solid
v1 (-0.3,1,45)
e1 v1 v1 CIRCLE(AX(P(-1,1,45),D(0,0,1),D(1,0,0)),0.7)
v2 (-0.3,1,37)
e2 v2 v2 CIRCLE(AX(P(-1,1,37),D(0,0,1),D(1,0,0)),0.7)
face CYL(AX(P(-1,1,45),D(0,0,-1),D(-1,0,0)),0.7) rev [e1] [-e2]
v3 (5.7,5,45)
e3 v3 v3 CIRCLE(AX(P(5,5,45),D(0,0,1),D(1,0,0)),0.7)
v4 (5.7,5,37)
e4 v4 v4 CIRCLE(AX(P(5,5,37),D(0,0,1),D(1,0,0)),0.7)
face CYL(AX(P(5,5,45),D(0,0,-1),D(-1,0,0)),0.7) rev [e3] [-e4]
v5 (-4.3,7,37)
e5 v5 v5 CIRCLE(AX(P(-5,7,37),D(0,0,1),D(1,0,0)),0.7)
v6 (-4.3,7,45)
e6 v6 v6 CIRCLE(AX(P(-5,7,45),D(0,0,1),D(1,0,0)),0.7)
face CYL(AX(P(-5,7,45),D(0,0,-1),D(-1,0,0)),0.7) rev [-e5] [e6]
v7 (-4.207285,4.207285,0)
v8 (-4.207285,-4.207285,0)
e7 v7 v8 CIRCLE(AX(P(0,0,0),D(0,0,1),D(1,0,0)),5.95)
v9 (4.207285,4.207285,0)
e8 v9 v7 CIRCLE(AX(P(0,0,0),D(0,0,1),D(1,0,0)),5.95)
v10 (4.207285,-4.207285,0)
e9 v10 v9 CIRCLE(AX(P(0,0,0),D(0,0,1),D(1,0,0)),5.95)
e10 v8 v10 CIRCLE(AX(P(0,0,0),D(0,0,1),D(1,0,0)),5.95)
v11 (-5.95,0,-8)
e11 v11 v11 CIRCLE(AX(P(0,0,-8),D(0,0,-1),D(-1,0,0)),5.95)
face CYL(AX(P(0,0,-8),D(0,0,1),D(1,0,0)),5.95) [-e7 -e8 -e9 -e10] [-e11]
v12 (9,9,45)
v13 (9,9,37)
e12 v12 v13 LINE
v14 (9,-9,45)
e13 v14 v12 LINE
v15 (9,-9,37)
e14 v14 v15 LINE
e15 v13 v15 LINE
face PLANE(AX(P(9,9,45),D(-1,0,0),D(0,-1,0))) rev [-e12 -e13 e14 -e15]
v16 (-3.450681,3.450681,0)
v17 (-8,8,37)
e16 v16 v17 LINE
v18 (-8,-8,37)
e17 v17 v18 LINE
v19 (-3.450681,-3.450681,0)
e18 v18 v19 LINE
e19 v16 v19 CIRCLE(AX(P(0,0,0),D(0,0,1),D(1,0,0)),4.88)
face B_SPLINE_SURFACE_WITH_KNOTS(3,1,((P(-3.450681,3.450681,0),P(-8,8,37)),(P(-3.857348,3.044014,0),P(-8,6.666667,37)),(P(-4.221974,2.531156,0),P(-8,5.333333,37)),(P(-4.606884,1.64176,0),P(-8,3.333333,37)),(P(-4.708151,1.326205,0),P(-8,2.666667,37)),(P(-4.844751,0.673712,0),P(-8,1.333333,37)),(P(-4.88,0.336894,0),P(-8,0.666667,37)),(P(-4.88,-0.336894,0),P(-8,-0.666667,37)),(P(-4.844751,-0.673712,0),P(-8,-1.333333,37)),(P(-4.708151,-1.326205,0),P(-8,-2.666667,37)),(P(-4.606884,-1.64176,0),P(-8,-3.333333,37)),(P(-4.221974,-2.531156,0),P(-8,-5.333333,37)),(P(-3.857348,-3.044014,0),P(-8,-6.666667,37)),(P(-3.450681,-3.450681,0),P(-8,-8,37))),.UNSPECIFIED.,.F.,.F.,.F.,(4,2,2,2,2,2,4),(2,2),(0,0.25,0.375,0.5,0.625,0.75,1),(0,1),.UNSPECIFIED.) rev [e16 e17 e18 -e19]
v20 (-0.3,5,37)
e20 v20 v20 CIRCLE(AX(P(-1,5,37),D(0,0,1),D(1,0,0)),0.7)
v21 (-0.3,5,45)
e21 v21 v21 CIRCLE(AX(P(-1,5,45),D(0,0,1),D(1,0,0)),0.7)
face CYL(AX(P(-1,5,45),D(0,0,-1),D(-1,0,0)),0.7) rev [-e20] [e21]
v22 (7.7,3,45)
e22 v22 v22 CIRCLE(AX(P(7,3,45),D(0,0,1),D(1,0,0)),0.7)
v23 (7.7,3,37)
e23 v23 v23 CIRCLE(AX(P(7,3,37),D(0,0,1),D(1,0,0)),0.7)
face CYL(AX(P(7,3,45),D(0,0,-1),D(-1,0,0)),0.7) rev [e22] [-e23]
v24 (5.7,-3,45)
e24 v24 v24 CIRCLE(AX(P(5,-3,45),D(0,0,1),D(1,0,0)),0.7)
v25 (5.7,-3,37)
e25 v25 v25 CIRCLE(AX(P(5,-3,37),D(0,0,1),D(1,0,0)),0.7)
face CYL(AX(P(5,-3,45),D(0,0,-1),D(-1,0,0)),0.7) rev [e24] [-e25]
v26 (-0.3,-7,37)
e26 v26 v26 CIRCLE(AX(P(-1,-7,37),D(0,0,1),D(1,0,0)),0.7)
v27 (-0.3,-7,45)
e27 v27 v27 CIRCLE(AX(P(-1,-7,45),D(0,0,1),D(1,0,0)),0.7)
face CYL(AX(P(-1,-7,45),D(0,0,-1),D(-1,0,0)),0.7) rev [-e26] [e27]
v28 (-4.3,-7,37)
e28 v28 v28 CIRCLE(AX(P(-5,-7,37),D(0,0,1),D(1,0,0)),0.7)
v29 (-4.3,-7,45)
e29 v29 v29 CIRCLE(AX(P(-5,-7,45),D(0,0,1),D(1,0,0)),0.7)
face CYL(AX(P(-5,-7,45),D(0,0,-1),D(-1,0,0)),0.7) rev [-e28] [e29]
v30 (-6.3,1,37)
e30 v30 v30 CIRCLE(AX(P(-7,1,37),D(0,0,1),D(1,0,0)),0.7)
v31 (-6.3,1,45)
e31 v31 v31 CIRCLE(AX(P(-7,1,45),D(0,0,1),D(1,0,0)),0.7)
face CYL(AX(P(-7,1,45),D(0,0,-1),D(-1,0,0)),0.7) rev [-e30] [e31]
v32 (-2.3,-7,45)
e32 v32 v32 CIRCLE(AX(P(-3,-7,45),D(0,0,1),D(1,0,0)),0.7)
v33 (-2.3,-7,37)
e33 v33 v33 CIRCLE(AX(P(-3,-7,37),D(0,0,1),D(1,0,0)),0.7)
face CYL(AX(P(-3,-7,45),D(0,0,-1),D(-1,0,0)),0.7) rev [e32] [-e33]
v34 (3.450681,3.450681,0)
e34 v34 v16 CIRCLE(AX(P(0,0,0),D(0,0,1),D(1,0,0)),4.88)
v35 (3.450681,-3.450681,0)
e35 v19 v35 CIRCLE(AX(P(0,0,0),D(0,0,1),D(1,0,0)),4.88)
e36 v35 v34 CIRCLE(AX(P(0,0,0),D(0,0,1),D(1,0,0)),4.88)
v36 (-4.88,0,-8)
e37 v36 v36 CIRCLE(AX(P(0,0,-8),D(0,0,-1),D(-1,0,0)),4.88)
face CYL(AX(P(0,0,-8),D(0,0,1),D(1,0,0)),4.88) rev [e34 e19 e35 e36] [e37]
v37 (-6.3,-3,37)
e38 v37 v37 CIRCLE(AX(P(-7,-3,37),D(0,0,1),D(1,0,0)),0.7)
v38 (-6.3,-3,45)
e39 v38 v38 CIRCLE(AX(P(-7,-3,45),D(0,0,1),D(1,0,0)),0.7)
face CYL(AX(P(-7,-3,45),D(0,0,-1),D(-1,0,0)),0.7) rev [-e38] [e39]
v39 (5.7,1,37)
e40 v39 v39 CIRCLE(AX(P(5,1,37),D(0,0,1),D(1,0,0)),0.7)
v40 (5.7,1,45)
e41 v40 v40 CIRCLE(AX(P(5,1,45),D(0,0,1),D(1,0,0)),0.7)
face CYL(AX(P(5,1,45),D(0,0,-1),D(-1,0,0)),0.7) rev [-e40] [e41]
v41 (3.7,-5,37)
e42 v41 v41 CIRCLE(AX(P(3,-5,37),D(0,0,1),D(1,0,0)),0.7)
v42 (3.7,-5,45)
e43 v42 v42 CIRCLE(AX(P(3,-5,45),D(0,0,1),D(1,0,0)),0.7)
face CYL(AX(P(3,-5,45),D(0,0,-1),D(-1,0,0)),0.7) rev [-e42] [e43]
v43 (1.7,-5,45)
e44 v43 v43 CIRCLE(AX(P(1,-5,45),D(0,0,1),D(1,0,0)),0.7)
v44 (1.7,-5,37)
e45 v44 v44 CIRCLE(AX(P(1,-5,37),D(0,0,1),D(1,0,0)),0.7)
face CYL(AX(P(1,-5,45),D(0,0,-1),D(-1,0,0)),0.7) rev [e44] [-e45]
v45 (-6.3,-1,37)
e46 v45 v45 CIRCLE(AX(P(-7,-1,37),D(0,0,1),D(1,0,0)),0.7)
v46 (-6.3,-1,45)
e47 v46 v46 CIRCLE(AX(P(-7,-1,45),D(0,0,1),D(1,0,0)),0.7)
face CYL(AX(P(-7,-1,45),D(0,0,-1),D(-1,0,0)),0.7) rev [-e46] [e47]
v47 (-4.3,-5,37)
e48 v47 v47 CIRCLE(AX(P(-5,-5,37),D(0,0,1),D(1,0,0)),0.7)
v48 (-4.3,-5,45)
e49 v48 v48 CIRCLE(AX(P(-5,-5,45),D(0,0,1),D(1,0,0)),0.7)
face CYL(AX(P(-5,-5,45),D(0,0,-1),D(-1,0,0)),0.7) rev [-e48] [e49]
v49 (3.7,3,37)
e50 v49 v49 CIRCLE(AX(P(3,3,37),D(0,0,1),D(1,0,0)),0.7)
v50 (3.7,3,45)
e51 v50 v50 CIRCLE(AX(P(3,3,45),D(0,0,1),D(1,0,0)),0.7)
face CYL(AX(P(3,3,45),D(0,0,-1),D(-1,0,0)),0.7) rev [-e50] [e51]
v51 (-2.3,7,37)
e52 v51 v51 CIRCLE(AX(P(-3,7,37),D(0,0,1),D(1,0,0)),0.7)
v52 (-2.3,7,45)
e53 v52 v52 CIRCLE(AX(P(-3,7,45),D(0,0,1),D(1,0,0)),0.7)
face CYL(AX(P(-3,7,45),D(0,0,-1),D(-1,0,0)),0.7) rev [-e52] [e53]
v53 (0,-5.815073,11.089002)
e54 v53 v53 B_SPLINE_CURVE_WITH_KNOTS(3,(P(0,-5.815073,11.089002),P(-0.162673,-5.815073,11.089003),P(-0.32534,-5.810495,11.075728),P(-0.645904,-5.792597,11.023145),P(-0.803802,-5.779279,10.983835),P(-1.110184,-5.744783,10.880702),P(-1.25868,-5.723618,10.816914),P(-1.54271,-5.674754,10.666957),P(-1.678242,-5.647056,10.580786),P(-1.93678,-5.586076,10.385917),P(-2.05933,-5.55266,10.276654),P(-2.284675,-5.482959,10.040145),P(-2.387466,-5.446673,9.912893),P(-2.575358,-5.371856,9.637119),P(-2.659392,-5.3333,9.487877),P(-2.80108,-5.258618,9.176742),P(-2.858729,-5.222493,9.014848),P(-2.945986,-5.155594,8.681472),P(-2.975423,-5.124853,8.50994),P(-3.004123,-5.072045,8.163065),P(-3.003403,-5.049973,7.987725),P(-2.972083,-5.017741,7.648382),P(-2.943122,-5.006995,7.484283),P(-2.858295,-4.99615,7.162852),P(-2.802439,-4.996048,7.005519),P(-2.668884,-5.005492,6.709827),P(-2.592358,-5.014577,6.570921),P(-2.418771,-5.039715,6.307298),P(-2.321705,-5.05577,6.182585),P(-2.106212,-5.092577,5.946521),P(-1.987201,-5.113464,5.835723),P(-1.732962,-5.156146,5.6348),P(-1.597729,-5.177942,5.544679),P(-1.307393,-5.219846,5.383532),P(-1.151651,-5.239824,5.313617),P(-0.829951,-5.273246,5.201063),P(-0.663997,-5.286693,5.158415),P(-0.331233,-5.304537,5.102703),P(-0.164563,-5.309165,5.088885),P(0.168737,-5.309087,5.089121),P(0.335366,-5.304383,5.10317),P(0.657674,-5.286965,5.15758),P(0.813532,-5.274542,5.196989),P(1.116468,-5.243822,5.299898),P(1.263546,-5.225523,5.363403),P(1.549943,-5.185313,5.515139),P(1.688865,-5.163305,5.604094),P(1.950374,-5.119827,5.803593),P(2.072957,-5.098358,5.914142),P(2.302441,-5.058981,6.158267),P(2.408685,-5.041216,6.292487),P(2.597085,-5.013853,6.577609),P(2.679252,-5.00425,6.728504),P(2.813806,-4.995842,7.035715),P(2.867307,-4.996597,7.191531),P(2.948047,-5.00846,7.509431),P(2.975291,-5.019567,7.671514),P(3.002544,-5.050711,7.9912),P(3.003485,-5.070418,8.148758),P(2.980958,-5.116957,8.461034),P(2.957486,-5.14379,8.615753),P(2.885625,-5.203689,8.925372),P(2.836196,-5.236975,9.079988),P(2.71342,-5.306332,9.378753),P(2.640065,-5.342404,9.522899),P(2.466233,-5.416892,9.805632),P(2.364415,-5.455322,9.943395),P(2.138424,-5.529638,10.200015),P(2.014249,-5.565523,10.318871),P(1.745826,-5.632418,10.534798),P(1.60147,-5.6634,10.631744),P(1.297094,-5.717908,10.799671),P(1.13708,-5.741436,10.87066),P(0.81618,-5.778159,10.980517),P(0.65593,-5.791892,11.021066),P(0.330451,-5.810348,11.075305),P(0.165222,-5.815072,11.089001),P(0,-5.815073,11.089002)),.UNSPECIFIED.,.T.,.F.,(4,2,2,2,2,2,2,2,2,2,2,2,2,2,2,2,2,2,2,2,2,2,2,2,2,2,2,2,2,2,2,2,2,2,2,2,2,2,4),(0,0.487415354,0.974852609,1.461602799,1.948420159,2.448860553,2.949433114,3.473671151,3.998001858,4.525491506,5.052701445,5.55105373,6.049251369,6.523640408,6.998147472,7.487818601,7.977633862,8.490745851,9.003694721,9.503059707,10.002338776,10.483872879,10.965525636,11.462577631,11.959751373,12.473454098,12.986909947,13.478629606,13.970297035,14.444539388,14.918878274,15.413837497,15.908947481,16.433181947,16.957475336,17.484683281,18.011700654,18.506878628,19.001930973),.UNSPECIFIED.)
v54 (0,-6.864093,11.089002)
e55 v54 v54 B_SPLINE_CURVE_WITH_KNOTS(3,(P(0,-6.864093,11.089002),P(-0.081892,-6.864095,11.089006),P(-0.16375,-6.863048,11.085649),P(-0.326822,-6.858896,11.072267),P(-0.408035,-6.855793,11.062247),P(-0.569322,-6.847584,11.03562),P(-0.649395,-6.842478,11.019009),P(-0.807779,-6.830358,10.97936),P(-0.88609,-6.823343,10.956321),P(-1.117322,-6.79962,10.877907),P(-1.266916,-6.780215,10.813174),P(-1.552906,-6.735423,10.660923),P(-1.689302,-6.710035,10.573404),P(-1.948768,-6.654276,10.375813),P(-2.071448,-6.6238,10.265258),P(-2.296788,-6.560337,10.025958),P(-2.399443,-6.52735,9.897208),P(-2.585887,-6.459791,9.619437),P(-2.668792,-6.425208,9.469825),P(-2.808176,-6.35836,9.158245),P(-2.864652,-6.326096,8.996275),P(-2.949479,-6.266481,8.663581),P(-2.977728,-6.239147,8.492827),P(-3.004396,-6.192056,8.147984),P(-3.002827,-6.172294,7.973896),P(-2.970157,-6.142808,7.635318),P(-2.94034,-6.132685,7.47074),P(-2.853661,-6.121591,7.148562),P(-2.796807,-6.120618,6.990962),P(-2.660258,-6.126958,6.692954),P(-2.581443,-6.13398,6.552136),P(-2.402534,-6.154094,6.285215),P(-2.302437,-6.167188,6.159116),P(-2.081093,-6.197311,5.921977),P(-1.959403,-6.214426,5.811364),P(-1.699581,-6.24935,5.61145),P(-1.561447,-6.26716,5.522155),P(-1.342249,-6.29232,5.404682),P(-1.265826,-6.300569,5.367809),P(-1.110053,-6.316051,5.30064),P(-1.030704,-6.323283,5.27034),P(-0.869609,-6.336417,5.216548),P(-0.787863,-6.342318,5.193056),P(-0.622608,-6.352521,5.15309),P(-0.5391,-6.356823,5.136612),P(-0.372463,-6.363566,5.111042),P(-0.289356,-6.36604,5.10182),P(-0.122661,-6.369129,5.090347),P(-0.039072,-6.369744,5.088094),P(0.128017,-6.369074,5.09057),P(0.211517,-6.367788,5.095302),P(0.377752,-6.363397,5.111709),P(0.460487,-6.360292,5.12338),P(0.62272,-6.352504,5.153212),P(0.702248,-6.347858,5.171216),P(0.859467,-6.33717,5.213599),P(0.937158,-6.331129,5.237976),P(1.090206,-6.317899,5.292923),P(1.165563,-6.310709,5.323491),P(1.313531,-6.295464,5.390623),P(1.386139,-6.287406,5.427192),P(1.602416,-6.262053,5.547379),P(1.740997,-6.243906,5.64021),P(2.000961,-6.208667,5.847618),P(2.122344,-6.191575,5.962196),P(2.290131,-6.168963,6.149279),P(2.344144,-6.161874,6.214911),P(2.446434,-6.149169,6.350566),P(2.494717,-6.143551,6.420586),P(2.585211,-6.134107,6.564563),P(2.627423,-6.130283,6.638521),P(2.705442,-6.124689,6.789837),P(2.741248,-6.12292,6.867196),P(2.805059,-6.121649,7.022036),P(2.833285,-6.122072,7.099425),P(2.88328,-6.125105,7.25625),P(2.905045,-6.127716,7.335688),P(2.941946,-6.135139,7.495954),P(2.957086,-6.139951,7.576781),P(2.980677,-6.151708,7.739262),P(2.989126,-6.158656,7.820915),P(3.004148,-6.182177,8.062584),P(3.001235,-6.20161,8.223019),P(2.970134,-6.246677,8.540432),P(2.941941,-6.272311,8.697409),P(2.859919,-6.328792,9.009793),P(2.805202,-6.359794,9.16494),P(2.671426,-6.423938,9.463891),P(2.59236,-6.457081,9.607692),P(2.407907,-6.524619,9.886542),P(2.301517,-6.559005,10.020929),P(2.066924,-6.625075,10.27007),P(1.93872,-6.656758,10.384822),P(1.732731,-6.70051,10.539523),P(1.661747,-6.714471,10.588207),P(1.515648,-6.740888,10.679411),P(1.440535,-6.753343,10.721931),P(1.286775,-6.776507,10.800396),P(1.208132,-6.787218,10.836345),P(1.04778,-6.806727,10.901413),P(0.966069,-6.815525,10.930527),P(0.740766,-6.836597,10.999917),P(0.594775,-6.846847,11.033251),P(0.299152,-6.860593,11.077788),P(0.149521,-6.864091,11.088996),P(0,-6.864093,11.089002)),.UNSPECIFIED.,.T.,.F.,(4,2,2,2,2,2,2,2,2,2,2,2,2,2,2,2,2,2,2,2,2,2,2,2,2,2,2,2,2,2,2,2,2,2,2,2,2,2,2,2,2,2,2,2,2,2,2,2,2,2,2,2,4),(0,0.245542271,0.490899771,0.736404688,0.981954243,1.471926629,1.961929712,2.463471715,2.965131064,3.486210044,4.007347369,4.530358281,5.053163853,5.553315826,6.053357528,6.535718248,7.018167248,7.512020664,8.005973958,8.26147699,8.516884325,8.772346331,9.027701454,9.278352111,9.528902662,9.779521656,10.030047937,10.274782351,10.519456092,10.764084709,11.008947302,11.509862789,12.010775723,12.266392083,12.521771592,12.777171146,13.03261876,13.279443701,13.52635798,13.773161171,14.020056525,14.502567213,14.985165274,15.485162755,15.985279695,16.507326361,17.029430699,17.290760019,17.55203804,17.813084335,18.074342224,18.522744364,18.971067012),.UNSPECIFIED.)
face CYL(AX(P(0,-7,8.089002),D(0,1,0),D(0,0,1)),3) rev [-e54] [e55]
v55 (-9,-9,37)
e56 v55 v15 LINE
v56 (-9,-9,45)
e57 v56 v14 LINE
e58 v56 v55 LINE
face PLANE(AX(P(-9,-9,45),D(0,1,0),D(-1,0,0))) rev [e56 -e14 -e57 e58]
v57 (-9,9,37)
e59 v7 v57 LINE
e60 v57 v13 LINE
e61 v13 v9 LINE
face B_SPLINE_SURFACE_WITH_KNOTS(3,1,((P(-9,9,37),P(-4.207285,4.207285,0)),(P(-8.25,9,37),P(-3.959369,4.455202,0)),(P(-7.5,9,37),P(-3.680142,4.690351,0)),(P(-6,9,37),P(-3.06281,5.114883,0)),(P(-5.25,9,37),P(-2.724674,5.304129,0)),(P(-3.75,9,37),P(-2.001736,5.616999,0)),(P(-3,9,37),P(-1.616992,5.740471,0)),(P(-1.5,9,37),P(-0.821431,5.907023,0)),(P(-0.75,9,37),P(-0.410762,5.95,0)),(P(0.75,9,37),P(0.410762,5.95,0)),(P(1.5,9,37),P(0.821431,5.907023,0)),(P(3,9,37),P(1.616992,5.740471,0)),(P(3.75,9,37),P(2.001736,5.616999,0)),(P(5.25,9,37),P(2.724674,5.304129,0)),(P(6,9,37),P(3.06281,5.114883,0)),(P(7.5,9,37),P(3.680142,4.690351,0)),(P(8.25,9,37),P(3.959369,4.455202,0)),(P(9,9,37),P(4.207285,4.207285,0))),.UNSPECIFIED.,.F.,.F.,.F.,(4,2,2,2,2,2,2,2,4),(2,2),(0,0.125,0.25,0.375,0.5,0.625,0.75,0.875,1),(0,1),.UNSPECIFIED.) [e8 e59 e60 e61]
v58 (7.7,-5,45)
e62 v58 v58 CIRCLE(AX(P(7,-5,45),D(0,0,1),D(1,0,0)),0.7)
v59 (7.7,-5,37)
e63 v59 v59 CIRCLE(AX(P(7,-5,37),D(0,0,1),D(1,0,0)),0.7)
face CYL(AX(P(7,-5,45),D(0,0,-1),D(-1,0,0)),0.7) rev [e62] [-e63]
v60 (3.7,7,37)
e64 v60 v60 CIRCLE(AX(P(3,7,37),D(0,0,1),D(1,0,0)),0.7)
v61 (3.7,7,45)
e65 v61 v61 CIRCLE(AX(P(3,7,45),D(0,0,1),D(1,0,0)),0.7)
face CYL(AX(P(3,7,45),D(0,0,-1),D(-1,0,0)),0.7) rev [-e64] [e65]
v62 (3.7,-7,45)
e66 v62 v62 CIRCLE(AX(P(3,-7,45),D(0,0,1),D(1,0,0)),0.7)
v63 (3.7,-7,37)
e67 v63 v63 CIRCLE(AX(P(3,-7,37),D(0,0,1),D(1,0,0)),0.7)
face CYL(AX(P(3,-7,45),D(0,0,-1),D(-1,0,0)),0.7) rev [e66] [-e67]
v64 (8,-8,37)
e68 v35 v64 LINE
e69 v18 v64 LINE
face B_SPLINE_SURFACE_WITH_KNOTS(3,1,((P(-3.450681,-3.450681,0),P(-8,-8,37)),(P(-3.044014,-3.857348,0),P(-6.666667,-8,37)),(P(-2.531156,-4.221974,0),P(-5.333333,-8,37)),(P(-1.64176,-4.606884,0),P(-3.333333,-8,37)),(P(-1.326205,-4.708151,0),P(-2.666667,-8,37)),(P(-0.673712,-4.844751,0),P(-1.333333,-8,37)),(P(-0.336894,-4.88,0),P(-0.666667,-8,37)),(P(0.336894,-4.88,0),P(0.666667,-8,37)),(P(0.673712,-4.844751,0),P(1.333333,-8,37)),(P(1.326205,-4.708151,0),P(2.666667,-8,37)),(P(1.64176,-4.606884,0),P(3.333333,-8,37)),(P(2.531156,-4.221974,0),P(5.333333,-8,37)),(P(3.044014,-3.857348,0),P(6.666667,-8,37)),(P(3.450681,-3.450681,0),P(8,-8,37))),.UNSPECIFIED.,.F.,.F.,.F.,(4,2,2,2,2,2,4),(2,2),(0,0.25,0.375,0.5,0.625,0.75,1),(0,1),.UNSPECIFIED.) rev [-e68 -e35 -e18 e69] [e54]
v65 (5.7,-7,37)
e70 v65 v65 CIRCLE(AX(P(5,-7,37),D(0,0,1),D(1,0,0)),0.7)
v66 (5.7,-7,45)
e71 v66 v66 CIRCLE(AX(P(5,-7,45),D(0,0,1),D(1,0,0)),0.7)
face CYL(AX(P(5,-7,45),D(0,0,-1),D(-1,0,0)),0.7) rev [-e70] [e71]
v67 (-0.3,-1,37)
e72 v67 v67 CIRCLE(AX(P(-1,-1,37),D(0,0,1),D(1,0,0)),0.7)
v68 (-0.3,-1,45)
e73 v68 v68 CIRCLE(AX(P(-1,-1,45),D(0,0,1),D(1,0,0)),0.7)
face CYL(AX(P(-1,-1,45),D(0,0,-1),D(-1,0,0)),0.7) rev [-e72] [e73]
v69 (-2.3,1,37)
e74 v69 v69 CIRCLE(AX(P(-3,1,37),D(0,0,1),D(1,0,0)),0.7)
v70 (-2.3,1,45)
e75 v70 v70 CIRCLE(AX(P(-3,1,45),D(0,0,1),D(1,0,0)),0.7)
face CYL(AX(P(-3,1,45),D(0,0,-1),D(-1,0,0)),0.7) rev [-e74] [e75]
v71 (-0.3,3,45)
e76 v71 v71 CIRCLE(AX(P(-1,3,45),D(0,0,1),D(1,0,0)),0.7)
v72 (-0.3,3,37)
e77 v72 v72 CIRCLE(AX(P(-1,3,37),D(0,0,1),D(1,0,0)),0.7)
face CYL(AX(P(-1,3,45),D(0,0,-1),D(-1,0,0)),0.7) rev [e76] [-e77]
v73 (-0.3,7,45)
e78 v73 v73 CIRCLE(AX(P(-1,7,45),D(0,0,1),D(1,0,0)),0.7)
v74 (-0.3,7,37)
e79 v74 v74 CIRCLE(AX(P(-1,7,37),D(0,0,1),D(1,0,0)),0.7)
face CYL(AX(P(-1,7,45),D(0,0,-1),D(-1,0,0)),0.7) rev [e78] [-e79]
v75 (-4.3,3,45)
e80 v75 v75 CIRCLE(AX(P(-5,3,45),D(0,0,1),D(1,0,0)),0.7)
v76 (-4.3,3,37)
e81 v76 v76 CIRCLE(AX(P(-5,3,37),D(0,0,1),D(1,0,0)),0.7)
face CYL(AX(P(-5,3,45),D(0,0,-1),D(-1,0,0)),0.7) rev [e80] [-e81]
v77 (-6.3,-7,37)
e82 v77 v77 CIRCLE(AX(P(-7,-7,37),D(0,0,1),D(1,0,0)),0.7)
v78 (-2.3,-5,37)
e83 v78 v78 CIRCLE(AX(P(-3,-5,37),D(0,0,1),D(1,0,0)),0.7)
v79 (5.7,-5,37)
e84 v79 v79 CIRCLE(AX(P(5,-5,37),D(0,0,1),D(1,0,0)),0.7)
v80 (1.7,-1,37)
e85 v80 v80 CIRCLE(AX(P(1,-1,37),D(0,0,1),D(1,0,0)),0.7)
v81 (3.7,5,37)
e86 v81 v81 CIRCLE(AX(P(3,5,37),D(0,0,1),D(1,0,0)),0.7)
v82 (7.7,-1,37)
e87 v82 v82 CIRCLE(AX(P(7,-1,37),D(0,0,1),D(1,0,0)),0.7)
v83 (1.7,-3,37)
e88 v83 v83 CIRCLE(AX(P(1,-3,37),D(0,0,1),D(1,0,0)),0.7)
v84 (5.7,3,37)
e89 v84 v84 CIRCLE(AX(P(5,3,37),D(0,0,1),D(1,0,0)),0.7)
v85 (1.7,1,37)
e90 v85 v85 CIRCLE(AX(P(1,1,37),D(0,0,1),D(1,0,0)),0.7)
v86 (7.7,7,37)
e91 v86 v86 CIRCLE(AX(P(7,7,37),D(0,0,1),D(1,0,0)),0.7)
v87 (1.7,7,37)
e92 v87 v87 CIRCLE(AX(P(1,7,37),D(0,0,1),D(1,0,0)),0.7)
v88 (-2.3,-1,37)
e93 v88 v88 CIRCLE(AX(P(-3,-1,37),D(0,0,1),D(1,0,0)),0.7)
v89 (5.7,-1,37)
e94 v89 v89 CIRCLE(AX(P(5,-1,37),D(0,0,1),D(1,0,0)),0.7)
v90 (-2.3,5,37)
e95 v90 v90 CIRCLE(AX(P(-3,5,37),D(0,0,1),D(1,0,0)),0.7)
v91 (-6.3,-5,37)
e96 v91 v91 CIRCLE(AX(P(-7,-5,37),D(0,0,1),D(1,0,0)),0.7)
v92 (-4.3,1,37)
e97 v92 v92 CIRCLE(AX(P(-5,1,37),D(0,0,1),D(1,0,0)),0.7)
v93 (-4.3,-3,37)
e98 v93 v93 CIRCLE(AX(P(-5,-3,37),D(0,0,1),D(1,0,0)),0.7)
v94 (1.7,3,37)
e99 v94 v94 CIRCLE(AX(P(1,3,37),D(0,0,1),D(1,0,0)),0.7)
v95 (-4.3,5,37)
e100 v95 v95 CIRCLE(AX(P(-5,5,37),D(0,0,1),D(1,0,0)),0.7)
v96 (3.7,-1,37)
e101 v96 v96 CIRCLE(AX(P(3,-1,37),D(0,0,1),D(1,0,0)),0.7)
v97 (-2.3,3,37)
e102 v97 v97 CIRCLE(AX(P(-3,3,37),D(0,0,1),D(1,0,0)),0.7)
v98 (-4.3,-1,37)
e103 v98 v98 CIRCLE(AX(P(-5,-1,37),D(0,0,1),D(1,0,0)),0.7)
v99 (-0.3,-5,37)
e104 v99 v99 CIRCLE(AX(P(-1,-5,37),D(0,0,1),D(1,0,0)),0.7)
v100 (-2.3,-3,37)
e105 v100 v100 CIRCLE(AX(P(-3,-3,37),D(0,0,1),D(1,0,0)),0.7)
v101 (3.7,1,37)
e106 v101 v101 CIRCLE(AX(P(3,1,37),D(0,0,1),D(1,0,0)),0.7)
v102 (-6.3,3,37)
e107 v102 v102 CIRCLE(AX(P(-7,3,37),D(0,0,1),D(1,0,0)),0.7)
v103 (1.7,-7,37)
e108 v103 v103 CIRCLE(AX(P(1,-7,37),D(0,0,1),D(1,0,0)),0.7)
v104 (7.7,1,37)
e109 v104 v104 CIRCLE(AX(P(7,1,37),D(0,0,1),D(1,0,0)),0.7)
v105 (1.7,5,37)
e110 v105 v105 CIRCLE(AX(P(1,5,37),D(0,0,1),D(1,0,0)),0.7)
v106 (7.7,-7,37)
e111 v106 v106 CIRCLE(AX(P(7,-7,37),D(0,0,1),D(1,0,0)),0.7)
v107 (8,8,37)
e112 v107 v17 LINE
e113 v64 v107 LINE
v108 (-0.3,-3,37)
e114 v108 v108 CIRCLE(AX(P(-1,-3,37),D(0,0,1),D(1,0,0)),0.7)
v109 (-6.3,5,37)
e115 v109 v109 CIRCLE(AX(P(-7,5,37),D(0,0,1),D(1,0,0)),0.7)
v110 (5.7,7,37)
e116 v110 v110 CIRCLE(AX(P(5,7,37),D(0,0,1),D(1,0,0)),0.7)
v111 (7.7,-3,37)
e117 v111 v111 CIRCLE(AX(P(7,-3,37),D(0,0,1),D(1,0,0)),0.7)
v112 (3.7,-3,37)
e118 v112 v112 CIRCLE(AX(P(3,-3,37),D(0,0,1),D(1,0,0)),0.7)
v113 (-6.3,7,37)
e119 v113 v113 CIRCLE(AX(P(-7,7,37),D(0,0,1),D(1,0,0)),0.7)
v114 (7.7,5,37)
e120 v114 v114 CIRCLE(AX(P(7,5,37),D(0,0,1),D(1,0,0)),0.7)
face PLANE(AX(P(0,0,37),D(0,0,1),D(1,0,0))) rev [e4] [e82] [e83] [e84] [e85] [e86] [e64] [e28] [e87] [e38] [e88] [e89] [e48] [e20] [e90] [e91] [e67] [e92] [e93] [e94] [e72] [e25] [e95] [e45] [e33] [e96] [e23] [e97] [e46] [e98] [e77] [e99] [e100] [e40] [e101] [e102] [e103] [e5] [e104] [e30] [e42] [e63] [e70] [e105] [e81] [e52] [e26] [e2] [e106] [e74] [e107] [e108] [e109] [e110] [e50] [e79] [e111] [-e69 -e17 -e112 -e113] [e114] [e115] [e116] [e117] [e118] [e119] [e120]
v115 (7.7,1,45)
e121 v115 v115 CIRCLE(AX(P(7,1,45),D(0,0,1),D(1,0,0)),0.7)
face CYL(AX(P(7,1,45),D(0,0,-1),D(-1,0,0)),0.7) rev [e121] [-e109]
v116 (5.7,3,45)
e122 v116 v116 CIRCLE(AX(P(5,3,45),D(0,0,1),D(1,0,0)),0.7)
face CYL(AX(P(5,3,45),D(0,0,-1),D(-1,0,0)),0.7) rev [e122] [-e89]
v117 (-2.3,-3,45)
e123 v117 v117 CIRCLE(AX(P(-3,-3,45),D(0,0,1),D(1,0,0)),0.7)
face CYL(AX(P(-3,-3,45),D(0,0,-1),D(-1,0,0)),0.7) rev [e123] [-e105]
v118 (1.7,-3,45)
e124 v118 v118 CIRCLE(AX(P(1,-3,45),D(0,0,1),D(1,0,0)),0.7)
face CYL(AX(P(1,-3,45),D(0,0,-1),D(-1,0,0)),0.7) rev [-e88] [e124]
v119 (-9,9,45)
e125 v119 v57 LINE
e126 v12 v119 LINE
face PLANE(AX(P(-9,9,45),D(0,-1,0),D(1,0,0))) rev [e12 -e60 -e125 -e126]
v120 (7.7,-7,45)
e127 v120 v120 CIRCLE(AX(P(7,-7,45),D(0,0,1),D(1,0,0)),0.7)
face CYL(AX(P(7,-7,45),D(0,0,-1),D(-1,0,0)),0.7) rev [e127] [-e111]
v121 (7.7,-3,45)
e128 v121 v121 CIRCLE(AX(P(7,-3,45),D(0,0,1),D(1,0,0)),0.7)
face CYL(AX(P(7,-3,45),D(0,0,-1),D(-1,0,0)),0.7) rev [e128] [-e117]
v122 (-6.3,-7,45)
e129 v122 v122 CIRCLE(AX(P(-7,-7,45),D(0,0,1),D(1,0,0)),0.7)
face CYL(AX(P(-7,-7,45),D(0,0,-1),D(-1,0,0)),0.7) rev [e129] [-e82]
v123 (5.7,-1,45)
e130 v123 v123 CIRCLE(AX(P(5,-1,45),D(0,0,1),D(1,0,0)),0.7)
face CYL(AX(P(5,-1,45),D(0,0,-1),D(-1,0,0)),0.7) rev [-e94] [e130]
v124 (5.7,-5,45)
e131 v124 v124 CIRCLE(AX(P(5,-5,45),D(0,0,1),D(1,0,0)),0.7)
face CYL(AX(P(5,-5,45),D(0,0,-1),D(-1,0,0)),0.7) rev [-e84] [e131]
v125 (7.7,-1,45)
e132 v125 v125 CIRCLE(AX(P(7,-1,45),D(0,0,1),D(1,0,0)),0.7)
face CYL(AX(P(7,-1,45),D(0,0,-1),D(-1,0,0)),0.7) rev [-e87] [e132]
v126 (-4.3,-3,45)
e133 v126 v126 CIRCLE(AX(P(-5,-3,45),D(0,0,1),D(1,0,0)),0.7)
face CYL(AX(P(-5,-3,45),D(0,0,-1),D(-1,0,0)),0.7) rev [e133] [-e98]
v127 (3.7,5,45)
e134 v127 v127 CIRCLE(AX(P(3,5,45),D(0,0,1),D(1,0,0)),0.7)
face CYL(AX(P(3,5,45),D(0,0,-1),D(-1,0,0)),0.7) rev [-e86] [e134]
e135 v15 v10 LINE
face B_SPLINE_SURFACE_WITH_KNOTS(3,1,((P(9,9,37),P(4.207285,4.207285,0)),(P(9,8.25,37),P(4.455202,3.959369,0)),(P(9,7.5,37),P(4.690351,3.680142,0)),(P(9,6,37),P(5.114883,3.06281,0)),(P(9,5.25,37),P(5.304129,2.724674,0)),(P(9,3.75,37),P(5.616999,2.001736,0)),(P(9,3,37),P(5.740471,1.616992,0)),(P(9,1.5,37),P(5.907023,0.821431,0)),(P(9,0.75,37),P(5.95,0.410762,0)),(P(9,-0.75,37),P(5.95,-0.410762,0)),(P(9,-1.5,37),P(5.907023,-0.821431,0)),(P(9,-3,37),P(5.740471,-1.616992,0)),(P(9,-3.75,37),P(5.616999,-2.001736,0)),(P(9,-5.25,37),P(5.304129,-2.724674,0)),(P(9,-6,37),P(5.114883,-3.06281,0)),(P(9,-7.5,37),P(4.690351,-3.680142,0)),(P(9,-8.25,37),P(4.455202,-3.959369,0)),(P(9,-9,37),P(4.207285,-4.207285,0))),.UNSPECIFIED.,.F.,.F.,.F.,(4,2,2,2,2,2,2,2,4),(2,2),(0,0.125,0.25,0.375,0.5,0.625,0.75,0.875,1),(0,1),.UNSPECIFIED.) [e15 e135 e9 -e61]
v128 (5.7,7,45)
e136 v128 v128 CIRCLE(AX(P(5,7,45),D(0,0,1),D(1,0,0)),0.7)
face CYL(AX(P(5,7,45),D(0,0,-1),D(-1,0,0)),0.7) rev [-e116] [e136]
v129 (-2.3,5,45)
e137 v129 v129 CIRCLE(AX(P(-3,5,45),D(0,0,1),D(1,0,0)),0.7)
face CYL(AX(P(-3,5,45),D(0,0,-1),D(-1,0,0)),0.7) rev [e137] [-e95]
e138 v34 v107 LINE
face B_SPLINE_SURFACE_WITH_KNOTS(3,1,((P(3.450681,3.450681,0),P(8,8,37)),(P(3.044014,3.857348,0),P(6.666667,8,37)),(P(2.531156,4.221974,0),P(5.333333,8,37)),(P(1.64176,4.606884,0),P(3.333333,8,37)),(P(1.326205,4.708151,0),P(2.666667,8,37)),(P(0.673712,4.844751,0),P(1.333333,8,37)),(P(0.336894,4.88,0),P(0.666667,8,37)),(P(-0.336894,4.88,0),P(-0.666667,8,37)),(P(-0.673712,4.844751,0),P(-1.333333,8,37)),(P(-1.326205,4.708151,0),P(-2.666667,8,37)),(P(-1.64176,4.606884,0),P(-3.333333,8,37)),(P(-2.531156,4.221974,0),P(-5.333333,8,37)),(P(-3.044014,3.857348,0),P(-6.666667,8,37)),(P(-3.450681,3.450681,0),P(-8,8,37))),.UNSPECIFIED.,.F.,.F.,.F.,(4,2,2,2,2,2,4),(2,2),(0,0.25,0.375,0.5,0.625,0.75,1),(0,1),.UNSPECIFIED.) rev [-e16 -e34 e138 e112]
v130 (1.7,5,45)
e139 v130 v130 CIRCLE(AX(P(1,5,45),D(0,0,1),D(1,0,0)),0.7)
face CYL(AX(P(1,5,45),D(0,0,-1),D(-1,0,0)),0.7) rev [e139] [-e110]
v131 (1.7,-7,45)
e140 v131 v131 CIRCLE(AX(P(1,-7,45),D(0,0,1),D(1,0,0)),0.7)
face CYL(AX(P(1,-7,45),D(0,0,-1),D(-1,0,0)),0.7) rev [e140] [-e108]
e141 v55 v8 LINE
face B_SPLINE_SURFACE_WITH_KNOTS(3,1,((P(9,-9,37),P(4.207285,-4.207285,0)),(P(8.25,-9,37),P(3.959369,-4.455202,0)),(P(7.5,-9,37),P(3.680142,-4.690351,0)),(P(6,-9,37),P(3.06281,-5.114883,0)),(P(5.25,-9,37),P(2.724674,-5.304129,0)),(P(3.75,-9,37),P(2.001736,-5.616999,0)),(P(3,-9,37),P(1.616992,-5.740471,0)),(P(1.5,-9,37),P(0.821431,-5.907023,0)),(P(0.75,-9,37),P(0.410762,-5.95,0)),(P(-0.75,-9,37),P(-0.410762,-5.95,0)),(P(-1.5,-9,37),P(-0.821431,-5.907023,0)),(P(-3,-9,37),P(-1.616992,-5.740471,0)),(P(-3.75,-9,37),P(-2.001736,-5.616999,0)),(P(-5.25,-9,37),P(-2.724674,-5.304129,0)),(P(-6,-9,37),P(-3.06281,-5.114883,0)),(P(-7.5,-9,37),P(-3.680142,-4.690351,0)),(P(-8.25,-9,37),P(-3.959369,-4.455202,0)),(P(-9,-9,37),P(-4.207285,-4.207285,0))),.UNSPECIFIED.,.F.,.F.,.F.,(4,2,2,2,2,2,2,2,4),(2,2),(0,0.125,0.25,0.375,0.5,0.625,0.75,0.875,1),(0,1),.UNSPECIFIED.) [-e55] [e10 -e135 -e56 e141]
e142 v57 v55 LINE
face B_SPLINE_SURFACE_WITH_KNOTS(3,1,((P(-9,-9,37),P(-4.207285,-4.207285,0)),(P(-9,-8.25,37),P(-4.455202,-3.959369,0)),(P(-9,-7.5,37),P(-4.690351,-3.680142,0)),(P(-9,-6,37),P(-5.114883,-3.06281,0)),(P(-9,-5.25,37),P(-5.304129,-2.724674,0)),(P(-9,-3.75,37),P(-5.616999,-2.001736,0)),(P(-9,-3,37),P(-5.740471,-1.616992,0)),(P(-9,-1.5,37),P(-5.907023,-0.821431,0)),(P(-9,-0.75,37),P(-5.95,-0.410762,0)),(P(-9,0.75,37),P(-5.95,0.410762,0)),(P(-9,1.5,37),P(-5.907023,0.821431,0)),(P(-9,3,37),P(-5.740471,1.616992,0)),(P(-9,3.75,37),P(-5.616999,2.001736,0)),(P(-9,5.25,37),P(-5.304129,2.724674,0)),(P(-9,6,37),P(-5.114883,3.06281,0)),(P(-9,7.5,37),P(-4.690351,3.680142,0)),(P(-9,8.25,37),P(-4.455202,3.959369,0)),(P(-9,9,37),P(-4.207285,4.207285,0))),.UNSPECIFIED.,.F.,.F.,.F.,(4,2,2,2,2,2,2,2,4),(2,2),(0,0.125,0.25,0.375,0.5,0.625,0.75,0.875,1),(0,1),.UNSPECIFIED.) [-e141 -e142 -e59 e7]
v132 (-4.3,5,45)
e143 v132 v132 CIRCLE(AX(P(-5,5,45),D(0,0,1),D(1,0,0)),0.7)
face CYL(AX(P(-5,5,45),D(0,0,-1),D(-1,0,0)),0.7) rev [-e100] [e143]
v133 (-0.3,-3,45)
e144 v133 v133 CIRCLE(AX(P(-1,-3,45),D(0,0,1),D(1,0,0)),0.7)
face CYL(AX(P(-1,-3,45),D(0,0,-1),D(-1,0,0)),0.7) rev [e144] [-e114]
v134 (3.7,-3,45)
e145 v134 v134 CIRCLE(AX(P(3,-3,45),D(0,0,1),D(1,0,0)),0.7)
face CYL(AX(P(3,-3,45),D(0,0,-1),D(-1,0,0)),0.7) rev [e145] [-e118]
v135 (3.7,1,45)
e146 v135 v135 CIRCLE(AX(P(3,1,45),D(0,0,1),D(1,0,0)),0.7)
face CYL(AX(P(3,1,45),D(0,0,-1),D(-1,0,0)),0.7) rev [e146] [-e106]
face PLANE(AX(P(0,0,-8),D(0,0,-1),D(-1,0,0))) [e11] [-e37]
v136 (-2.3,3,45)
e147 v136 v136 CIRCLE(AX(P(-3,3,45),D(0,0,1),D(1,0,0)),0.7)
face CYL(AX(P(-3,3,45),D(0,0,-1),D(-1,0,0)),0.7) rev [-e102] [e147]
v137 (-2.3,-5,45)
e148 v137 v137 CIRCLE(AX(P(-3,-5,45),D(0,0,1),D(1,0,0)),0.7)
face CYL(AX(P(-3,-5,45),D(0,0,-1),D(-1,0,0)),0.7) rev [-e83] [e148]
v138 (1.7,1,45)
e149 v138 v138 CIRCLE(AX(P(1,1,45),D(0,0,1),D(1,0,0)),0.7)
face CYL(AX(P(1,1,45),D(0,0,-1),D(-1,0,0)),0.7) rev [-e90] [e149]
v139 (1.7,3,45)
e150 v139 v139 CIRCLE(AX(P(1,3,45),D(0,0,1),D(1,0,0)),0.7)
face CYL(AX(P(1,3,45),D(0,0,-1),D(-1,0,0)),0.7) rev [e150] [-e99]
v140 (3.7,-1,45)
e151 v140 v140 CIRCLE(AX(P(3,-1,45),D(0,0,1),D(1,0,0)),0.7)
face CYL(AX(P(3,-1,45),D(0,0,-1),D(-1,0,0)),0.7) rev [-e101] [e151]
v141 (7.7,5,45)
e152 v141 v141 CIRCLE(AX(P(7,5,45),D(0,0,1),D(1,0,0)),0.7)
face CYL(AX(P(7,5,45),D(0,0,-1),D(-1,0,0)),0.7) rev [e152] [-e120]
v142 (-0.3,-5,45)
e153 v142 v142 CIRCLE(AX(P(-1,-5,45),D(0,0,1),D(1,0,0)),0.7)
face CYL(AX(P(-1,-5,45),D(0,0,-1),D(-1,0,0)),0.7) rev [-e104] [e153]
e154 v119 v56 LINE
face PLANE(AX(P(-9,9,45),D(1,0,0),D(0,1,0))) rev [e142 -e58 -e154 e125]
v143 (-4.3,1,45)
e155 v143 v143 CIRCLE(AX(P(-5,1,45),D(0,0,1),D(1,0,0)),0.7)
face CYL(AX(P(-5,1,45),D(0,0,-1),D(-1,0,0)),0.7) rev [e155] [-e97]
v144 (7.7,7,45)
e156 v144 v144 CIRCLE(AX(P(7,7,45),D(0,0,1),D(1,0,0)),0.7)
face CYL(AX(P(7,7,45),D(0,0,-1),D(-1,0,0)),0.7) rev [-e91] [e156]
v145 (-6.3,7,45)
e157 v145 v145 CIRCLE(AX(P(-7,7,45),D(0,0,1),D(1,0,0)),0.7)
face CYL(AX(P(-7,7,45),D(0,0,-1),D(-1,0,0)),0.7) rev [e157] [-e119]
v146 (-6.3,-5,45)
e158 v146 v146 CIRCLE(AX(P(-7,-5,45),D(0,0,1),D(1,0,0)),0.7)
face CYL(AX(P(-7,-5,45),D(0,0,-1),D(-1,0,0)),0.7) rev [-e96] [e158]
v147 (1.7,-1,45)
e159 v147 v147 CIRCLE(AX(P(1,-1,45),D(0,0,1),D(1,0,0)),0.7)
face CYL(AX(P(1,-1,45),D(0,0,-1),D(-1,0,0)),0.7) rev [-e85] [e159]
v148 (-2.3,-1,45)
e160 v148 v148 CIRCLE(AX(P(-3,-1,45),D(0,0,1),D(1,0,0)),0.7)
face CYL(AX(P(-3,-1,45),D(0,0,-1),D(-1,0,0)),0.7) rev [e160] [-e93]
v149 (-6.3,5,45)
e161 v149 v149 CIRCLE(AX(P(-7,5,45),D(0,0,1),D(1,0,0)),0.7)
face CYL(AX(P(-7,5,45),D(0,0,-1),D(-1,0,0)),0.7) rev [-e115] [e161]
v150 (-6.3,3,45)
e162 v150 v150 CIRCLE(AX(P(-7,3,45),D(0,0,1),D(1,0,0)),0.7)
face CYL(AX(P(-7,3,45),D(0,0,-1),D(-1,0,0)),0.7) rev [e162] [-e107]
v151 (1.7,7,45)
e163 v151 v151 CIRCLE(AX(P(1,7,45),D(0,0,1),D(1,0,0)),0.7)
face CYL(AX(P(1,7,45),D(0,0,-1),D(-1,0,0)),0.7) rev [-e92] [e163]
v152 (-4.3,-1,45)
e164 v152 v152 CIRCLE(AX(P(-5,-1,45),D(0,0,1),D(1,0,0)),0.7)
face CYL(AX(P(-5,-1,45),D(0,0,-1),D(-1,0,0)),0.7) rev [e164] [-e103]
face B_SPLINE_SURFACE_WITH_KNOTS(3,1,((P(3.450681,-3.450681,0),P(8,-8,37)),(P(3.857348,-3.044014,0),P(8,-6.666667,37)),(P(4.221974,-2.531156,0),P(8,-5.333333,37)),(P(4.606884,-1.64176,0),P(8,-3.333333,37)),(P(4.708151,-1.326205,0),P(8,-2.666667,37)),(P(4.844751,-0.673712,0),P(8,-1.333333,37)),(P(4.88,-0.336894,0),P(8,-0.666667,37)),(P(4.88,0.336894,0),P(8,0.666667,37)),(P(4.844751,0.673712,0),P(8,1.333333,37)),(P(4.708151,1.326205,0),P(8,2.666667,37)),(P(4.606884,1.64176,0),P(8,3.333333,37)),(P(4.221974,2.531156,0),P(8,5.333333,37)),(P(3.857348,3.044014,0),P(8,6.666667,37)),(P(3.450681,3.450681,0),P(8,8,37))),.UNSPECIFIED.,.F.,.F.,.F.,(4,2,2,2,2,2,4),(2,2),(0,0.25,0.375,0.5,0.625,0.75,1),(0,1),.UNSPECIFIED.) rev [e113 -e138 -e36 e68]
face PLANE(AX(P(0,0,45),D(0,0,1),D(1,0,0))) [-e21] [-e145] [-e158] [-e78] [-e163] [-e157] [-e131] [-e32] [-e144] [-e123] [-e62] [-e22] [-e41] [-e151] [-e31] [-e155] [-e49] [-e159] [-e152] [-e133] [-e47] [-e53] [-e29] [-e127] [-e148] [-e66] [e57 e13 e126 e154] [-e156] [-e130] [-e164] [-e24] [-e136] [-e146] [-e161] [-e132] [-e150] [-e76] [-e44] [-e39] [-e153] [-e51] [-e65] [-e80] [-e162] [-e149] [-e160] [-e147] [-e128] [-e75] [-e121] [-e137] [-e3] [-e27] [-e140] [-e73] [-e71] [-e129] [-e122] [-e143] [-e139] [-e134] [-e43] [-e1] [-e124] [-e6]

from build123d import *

# Parameters (mm, degrees)
SKETCH4_W           = 18
SKETCH4_H           = 18
BOSS_EXTRUDE1_DEPTH = 8
SKETCH5_R           = 0.7
CUT_EXTRUDE1_DEPTH  = 8
SKETCH6_R           = 5.95
SKETCH6_R_2         = 4.88
BOSS_EXTRUDE2_DEPTH = 8
SKETCH8_R           = 3
CUT_EXTRUDE3_DEPTH  = 7


with BuildPart() as part:
    # Loft1: read off the stored shape, not the designer's step
    # Loft1: loft between two sections, ruled curve by curve
    loft1_from = [
        Edge.make_bspline([(-9, 9, 37), (-8.25, 9, 37), (-7.5, 9, 37), (-6, 9, 37), (-5.25, 9, 37), (-3.75, 9, 37), (-3, 9, 37), (-1.5, 9, 37), (-0.75, 9, 37), (0.75, 9, 37), (1.5, 9, 37), (3, 9, 37), (3.75, 9, 37), (5.25, 9, 37), (6, 9, 37), (7.5, 9, 37), (8.25, 9, 37), (9, 9, 37)], [0, 0, 0, 0, 0.125, 0.125, 0.25, 0.25, 0.375, 0.375, 0.5, 0.5, 0.625, 0.625, 0.75, 0.75, 0.875, 0.875, 1, 1, 1, 1], 3),
        Edge.make_bspline([(9, 9, 37), (9, 8.25, 37), (9, 7.5, 37), (9, 6, 37), (9, 5.25, 37), (9, 3.75, 37), (9, 3, 37), (9, 1.5, 37), (9, 0.75, 37), (9, -0.75, 37), (9, -1.5, 37), (9, -3, 37), (9, -3.75, 37), (9, -5.25, 37), (9, -6, 37), (9, -7.5, 37), (9, -8.25, 37), (9, -9, 37)], [0, 0, 0, 0, 0.125, 0.125, 0.25, 0.25, 0.375, 0.375, 0.5, 0.5, 0.625, 0.625, 0.75, 0.75, 0.875, 0.875, 1, 1, 1, 1], 3),
        Edge.make_bspline([(-9, -9, 37), (-9, -8.25, 37), (-9, -7.5, 37), (-9, -6, 37), (-9, -5.25, 37), (-9, -3.75, 37), (-9, -3, 37), (-9, -1.5, 37), (-9, -0.75, 37), (-9, 0.75, 37), (-9, 1.5, 37), (-9, 3, 37), (-9, 3.75, 37), (-9, 5.25, 37), (-9, 6, 37), (-9, 7.5, 37), (-9, 8.25, 37), (-9, 9, 37)], [0, 0, 0, 0, 0.125, 0.125, 0.25, 0.25, 0.375, 0.375, 0.5, 0.5, 0.625, 0.625, 0.75, 0.75, 0.875, 0.875, 1, 1, 1, 1], 3),
        Edge.make_bspline([(9, -9, 37), (8.25, -9, 37), (7.5, -9, 37), (6, -9, 37), (5.25, -9, 37), (3.75, -9, 37), (3, -9, 37), (1.5, -9, 37), (0.75, -9, 37), (-0.75, -9, 37), (-1.5, -9, 37), (-3, -9, 37), (-3.75, -9, 37), (-5.25, -9, 37), (-6, -9, 37), (-7.5, -9, 37), (-8.25, -9, 37), (-9, -9, 37)], [0, 0, 0, 0, 0.125, 0.125, 0.25, 0.25, 0.375, 0.375, 0.5, 0.5, 0.625, 0.625, 0.75, 0.75, 0.875, 0.875, 1, 1, 1, 1], 3),
    ]
    loft1_to = [
        Edge.make_bspline([(-4.207285348, 4.207285348, 0), (-3.959368681, 4.455202015, 0), (-3.680141586, 4.690350666, 0), (-3.062809983, 5.114882841, 0), (-2.72467395, 5.304128911, 0), (-2.001736485, 5.616999437, 0), (-1.616991653, 5.740470541, 0), (-0.821431093, 5.907022516, 0), (-0.410761783, 5.95, 0), (0.410761783, 5.95, 0), (0.821431093, 5.907022516, 0), (1.616991653, 5.740470541, 0), (2.001736485, 5.616999437, 0), (2.72467395, 5.304128911, 0), (3.062809983, 5.114882841, 0), (3.680141586, 4.690350666, 0), (3.959368681, 4.455202015, 0), (4.207285348, 4.207285348, 0)], [0, 0, 0, 0, 0.125, 0.125, 0.25, 0.25, 0.375, 0.375, 0.5, 0.5, 0.625, 0.625, 0.75, 0.75, 0.875, 0.875, 1, 1, 1, 1], 3),
        Edge.make_bspline([(4.207285348, 4.207285348, 0), (4.455202015, 3.959368681, 0), (4.690350666, 3.680141586, 0), (5.114882841, 3.062809983, 0), (5.304128911, 2.72467395, 0), (5.616999437, 2.001736485, 0), (5.740470541, 1.616991653, 0), (5.907022516, 0.821431093, 0), (5.95, 0.410761783, 0), (5.95, -0.410761783, 0), (5.907022516, -0.821431093, 0), (5.740470541, -1.616991653, 0), (5.616999437, -2.001736485, 0), (5.304128911, -2.72467395, 0), (5.114882841, -3.062809983, 0), (4.690350666, -3.680141586, 0), (4.455202015, -3.959368681, 0), (4.207285348, -4.207285348, 0)], [0, 0, 0, 0, 0.125, 0.125, 0.25, 0.25, 0.375, 0.375, 0.5, 0.5, 0.625, 0.625, 0.75, 0.75, 0.875, 0.875, 1, 1, 1, 1], 3),
        Edge.make_bspline([(-4.207285348, -4.207285348, 0), (-4.455202015, -3.959368681, 0), (-4.690350666, -3.680141586, 0), (-5.114882841, -3.062809983, 0), (-5.304128911, -2.72467395, 0), (-5.616999437, -2.001736485, 0), (-5.740470541, -1.616991653, 0), (-5.907022516, -0.821431093, 0), (-5.95, -0.410761783, 0), (-5.95, 0.410761783, 0), (-5.907022516, 0.821431093, 0), (-5.740470541, 1.616991653, 0), (-5.616999437, 2.001736485, 0), (-5.304128911, 2.72467395, 0), (-5.114882841, 3.062809983, 0), (-4.690350666, 3.680141586, 0), (-4.455202015, 3.959368681, 0), (-4.207285348, 4.207285348, 0)], [0, 0, 0, 0, 0.125, 0.125, 0.25, 0.25, 0.375, 0.375, 0.5, 0.5, 0.625, 0.625, 0.75, 0.75, 0.875, 0.875, 1, 1, 1, 1], 3),
        Edge.make_bspline([(4.207285348, -4.207285348, 0), (3.959368681, -4.455202015, 0), (3.680141586, -4.690350666, 0), (3.062809983, -5.114882841, 0), (2.72467395, -5.304128911, 0), (2.001736485, -5.616999437, 0), (1.616991653, -5.740470541, 0), (0.821431093, -5.907022516, 0), (0.410761783, -5.95, 0), (-0.410761783, -5.95, 0), (-0.821431093, -5.907022516, 0), (-1.616991653, -5.740470541, 0), (-2.001736485, -5.616999437, 0), (-2.72467395, -5.304128911, 0), (-3.062809983, -5.114882841, 0), (-3.680141586, -4.690350666, 0), (-3.959368681, -4.455202015, 0), (-4.207285348, -4.207285348, 0)], [0, 0, 0, 0, 0.125, 0.125, 0.25, 0.25, 0.375, 0.375, 0.5, 0.5, 0.625, 0.625, 0.75, 0.75, 0.875, 0.875, 1, 1, 1, 1], 3),
    ]
    loft1 = Solid(Shell([*[Face.make_surface_from_curves(loft1_from[k], loft1_to[k]) for k in range(4)], Face(Wire(loft1_from)), Face(Wire(loft1_to))]))
    add(loft1)

    # Cut-Loft1: read off the stored shape, not the designer's step
    # Cut-Loft1: loft between two sections, ruled curve by curve
    cut_loft1_from = [
        Edge.make_bspline([(-3.450681092, -3.450681092, 0), (-3.044014426, -3.857347759, 0), (-2.531155679, -4.22197395, 0), (-1.641760344, -4.606883572, 0), (-1.326204919, -4.708150629, 0), (-0.673711552, -4.84475124, 0), (-0.336893697, -4.88, 0), (0.336893697, -4.88, 0), (0.673711552, -4.84475124, 0), (1.326204919, -4.708150629, 0), (1.641760344, -4.606883572, 0), (2.531155679, -4.22197395, 0), (3.044014426, -3.857347759, 0), (3.450681092, -3.450681092, 0)], [0, 0, 0, 0, 0.25, 0.25, 0.375, 0.375, 0.5, 0.5, 0.625, 0.625, 0.75, 0.75, 1, 1, 1, 1], 3),
        Edge.make_bspline([(3.450681092, -3.450681092, 0), (3.857347759, -3.044014426, 0), (4.22197395, -2.531155679, 0), (4.606883572, -1.641760344, 0), (4.708150629, -1.326204919, 0), (4.84475124, -0.673711552, 0), (4.88, -0.336893697, 0), (4.88, 0.336893697, 0), (4.84475124, 0.673711552, 0), (4.708150629, 1.326204919, 0), (4.606883572, 1.641760344, 0), (4.22197395, 2.531155679, 0), (3.857347759, 3.044014426, 0), (3.450681092, 3.450681092, 0)], [0, 0, 0, 0, 0.25, 0.25, 0.375, 0.375, 0.5, 0.5, 0.625, 0.625, 0.75, 0.75, 1, 1, 1, 1], 3),
        Edge.make_bspline([(-3.450681092, 3.450681092, 0), (-3.857347759, 3.044014426, 0), (-4.22197395, 2.531155679, 0), (-4.606883572, 1.641760344, 0), (-4.708150629, 1.326204919, 0), (-4.84475124, 0.673711552, 0), (-4.88, 0.336893697, 0), (-4.88, -0.336893697, 0), (-4.84475124, -0.673711552, 0), (-4.708150629, -1.326204919, 0), (-4.606883572, -1.641760344, 0), (-4.22197395, -2.531155679, 0), (-3.857347759, -3.044014426, 0), (-3.450681092, -3.450681092, 0)], [0, 0, 0, 0, 0.25, 0.25, 0.375, 0.375, 0.5, 0.5, 0.625, 0.625, 0.75, 0.75, 1, 1, 1, 1], 3),
        Edge.make_bspline([(3.450681092, 3.450681092, 0), (3.044014426, 3.857347759, 0), (2.531155679, 4.22197395, 0), (1.641760344, 4.606883572, 0), (1.326204919, 4.708150629, 0), (0.673711552, 4.84475124, 0), (0.336893697, 4.88, 0), (-0.336893697, 4.88, 0), (-0.673711552, 4.84475124, 0), (-1.326204919, 4.708150629, 0), (-1.641760344, 4.606883572, 0), (-2.531155679, 4.22197395, 0), (-3.044014426, 3.857347759, 0), (-3.450681092, 3.450681092, 0)], [0, 0, 0, 0, 0.25, 0.25, 0.375, 0.375, 0.5, 0.5, 0.625, 0.625, 0.75, 0.75, 1, 1, 1, 1], 3),
    ]
    cut_loft1_to = [
        Edge.make_bspline([(-8, -8, 37), (-6.666666667, -8, 37), (-5.333333333, -8, 37), (-3.333333333, -8, 37), (-2.666666667, -8, 37), (-1.333333333, -8, 37), (-0.666666667, -8, 37), (0.666666667, -8, 37), (1.333333333, -8, 37), (2.666666667, -8, 37), (3.333333333, -8, 37), (5.333333333, -8, 37), (6.666666667, -8, 37), (8, -8, 37)], [0, 0, 0, 0, 0.25, 0.25, 0.375, 0.375, 0.5, 0.5, 0.625, 0.625, 0.75, 0.75, 1, 1, 1, 1], 3),
        Edge.make_bspline([(8, -8, 37), (8, -6.666666667, 37), (8, -5.333333333, 37), (8, -3.333333333, 37), (8, -2.666666667, 37), (8, -1.333333333, 37), (8, -0.666666667, 37), (8, 0.666666667, 37), (8, 1.333333333, 37), (8, 2.666666667, 37), (8, 3.333333333, 37), (8, 5.333333333, 37), (8, 6.666666667, 37), (8, 8, 37)], [0, 0, 0, 0, 0.25, 0.25, 0.375, 0.375, 0.5, 0.5, 0.625, 0.625, 0.75, 0.75, 1, 1, 1, 1], 3),
        Edge.make_bspline([(-8, 8, 37), (-8, 6.666666667, 37), (-8, 5.333333333, 37), (-8, 3.333333333, 37), (-8, 2.666666667, 37), (-8, 1.333333333, 37), (-8, 0.666666667, 37), (-8, -0.666666667, 37), (-8, -1.333333333, 37), (-8, -2.666666667, 37), (-8, -3.333333333, 37), (-8, -5.333333333, 37), (-8, -6.666666667, 37), (-8, -8, 37)], [0, 0, 0, 0, 0.25, 0.25, 0.375, 0.375, 0.5, 0.5, 0.625, 0.625, 0.75, 0.75, 1, 1, 1, 1], 3),
        Edge.make_bspline([(8, 8, 37), (6.666666667, 8, 37), (5.333333333, 8, 37), (3.333333333, 8, 37), (2.666666667, 8, 37), (1.333333333, 8, 37), (0.666666667, 8, 37), (-0.666666667, 8, 37), (-1.333333333, 8, 37), (-2.666666667, 8, 37), (-3.333333333, 8, 37), (-5.333333333, 8, 37), (-6.666666667, 8, 37), (-8, 8, 37)], [0, 0, 0, 0, 0.25, 0.25, 0.375, 0.375, 0.5, 0.5, 0.625, 0.625, 0.75, 0.75, 1, 1, 1, 1], 3),
    ]
    cut_loft1 = Solid(Shell([*[Face.make_surface_from_curves(cut_loft1_from[k], cut_loft1_to[k]) for k in range(4)], Face(Wire(cut_loft1_from)), Face(Wire(cut_loft1_to))]))
    add(cut_loft1, mode=Mode.SUBTRACT)

    # Sketch4 → Boss-Extrude1 (add)
    with BuildSketch(Plane.XY.offset(37)):
        Rectangle(SKETCH4_W, SKETCH4_H)
    extrude(amount=BOSS_EXTRUDE1_DEPTH)

    # Sketch5 → Cut-Extrude1 (cut)
    with BuildSketch(Plane.XY.offset(37)):
        with Locations((-7, 7)):
            Circle(SKETCH5_R)
        with Locations((-5, 7)):
            Circle(SKETCH5_R)
        with Locations((-3, 7)):
            Circle(SKETCH5_R)
        with Locations((-1, 7)):
            Circle(SKETCH5_R)
        with Locations((1, 7)):
            Circle(SKETCH5_R)
        with Locations((3, 7)):
            Circle(SKETCH5_R)
        with Locations((5, 7)):
            Circle(SKETCH5_R)
        with Locations((7, 7)):
            Circle(SKETCH5_R)
        with Locations((-5, 5)):
            Circle(SKETCH5_R)
        with Locations((-3, 5)):
            Circle(SKETCH5_R)
        with Locations((-1, 5)):
            Circle(SKETCH5_R)
        with Locations((1, 5)):
            Circle(SKETCH5_R)
        with Locations((3, 5)):
            Circle(SKETCH5_R)
        with Locations((5, 5)):
            Circle(SKETCH5_R)
        with Locations((7, 5)):
            Circle(SKETCH5_R)
        with Locations((-5, 3)):
            Circle(SKETCH5_R)
        with Locations((-3, 3)):
            Circle(SKETCH5_R)
        with Locations((-1, 3)):
            Circle(SKETCH5_R)
        with Locations((1, 3)):
            Circle(SKETCH5_R)
        with Locations((3, 3)):
            Circle(SKETCH5_R)
        with Locations((5, 3)):
            Circle(SKETCH5_R)
        with Locations((7, 3)):
            Circle(SKETCH5_R)
        with Locations((-5, 1)):
            Circle(SKETCH5_R)
        with Locations((-3, 1)):
            Circle(SKETCH5_R)
        with Locations((-1, 1)):
            Circle(SKETCH5_R)
        with Locations((1, 1)):
            Circle(SKETCH5_R)
        with Locations((3, 1)):
            Circle(SKETCH5_R)
        with Locations((5, 1)):
            Circle(SKETCH5_R)
        with Locations((7, 1)):
            Circle(SKETCH5_R)
        with Locations((-5, -1)):
            Circle(SKETCH5_R)
        with Locations((-3, -1)):
            Circle(SKETCH5_R)
        with Locations((-1, -1)):
            Circle(SKETCH5_R)
        with Locations((1, -1)):
            Circle(SKETCH5_R)
        with Locations((3, -1)):
            Circle(SKETCH5_R)
        with Locations((5, -1)):
            Circle(SKETCH5_R)
        with Locations((7, -1)):
            Circle(SKETCH5_R)
        with Locations((-5, -3)):
            Circle(SKETCH5_R)
        with Locations((-3, -3)):
            Circle(SKETCH5_R)
        with Locations((-1, -3)):
            Circle(SKETCH5_R)
        with Locations((1, -3)):
            Circle(SKETCH5_R)
        with Locations((3, -3)):
            Circle(SKETCH5_R)
        with Locations((5, -3)):
            Circle(SKETCH5_R)
        with Locations((7, -3)):
            Circle(SKETCH5_R)
        with Locations((-5, -5)):
            Circle(SKETCH5_R)
        with Locations((-3, -5)):
            Circle(SKETCH5_R)
        with Locations((-1, -5)):
            Circle(SKETCH5_R)
        with Locations((1, -5)):
            Circle(SKETCH5_R)
        with Locations((3, -5)):
            Circle(SKETCH5_R)
        with Locations((5, -5)):
            Circle(SKETCH5_R)
        with Locations((7, -5)):
            Circle(SKETCH5_R)
        with Locations((-5, -7)):
            Circle(SKETCH5_R)
        with Locations((-3, -7)):
            Circle(SKETCH5_R)
        with Locations((-1, -7)):
            Circle(SKETCH5_R)
        with Locations((1, -7)):
            Circle(SKETCH5_R)
        with Locations((3, -7)):
            Circle(SKETCH5_R)
        with Locations((5, -7)):
            Circle(SKETCH5_R)
        with Locations((7, -7)):
            Circle(SKETCH5_R)
        with Locations((-7, 5)):
            Circle(SKETCH5_R)
        with Locations((-7, 3)):
            Circle(SKETCH5_R)
        with Locations((-7, 1)):
            Circle(SKETCH5_R)
        with Locations((-7, -1)):
            Circle(SKETCH5_R)
        with Locations((-7, -3)):
            Circle(SKETCH5_R)
        with Locations((-7, -5)):
            Circle(SKETCH5_R)
        with Locations((-7, -7)):
            Circle(SKETCH5_R)
    extrude(amount=CUT_EXTRUDE1_DEPTH, mode=Mode.SUBTRACT)

    # Sketch6 → Boss-Extrude2 (add)
    with BuildSketch(Plane(origin=(0, 0, 0), x_dir=(-1, 0, 0), z_dir=(0, 0, -1))):
        with Locations(Location((0, 0, 0), (0, 0, 135))):
            Circle(SKETCH6_R)
        with Locations(Location((0, 0, 0), (0, 0, 225))):
            Circle(SKETCH6_R_2, mode=Mode.SUBTRACT)
    extrude(amount=BOSS_EXTRUDE2_DEPTH)

    # Sketch8 → Cut-Extrude3 (cut)
    with BuildSketch(Plane(origin=(0, 0, 0), x_dir=(1, 0, 0), z_dir=(0, 1, 0))):
        with Locations(Location((0, -8.089002327, 0), (0, 0, 270))):
            Circle(SKETCH8_R)
    extrude(amount=-CUT_EXTRUDE3_DEPTH, mode=Mode.SUBTRACT)


solid = part.part
